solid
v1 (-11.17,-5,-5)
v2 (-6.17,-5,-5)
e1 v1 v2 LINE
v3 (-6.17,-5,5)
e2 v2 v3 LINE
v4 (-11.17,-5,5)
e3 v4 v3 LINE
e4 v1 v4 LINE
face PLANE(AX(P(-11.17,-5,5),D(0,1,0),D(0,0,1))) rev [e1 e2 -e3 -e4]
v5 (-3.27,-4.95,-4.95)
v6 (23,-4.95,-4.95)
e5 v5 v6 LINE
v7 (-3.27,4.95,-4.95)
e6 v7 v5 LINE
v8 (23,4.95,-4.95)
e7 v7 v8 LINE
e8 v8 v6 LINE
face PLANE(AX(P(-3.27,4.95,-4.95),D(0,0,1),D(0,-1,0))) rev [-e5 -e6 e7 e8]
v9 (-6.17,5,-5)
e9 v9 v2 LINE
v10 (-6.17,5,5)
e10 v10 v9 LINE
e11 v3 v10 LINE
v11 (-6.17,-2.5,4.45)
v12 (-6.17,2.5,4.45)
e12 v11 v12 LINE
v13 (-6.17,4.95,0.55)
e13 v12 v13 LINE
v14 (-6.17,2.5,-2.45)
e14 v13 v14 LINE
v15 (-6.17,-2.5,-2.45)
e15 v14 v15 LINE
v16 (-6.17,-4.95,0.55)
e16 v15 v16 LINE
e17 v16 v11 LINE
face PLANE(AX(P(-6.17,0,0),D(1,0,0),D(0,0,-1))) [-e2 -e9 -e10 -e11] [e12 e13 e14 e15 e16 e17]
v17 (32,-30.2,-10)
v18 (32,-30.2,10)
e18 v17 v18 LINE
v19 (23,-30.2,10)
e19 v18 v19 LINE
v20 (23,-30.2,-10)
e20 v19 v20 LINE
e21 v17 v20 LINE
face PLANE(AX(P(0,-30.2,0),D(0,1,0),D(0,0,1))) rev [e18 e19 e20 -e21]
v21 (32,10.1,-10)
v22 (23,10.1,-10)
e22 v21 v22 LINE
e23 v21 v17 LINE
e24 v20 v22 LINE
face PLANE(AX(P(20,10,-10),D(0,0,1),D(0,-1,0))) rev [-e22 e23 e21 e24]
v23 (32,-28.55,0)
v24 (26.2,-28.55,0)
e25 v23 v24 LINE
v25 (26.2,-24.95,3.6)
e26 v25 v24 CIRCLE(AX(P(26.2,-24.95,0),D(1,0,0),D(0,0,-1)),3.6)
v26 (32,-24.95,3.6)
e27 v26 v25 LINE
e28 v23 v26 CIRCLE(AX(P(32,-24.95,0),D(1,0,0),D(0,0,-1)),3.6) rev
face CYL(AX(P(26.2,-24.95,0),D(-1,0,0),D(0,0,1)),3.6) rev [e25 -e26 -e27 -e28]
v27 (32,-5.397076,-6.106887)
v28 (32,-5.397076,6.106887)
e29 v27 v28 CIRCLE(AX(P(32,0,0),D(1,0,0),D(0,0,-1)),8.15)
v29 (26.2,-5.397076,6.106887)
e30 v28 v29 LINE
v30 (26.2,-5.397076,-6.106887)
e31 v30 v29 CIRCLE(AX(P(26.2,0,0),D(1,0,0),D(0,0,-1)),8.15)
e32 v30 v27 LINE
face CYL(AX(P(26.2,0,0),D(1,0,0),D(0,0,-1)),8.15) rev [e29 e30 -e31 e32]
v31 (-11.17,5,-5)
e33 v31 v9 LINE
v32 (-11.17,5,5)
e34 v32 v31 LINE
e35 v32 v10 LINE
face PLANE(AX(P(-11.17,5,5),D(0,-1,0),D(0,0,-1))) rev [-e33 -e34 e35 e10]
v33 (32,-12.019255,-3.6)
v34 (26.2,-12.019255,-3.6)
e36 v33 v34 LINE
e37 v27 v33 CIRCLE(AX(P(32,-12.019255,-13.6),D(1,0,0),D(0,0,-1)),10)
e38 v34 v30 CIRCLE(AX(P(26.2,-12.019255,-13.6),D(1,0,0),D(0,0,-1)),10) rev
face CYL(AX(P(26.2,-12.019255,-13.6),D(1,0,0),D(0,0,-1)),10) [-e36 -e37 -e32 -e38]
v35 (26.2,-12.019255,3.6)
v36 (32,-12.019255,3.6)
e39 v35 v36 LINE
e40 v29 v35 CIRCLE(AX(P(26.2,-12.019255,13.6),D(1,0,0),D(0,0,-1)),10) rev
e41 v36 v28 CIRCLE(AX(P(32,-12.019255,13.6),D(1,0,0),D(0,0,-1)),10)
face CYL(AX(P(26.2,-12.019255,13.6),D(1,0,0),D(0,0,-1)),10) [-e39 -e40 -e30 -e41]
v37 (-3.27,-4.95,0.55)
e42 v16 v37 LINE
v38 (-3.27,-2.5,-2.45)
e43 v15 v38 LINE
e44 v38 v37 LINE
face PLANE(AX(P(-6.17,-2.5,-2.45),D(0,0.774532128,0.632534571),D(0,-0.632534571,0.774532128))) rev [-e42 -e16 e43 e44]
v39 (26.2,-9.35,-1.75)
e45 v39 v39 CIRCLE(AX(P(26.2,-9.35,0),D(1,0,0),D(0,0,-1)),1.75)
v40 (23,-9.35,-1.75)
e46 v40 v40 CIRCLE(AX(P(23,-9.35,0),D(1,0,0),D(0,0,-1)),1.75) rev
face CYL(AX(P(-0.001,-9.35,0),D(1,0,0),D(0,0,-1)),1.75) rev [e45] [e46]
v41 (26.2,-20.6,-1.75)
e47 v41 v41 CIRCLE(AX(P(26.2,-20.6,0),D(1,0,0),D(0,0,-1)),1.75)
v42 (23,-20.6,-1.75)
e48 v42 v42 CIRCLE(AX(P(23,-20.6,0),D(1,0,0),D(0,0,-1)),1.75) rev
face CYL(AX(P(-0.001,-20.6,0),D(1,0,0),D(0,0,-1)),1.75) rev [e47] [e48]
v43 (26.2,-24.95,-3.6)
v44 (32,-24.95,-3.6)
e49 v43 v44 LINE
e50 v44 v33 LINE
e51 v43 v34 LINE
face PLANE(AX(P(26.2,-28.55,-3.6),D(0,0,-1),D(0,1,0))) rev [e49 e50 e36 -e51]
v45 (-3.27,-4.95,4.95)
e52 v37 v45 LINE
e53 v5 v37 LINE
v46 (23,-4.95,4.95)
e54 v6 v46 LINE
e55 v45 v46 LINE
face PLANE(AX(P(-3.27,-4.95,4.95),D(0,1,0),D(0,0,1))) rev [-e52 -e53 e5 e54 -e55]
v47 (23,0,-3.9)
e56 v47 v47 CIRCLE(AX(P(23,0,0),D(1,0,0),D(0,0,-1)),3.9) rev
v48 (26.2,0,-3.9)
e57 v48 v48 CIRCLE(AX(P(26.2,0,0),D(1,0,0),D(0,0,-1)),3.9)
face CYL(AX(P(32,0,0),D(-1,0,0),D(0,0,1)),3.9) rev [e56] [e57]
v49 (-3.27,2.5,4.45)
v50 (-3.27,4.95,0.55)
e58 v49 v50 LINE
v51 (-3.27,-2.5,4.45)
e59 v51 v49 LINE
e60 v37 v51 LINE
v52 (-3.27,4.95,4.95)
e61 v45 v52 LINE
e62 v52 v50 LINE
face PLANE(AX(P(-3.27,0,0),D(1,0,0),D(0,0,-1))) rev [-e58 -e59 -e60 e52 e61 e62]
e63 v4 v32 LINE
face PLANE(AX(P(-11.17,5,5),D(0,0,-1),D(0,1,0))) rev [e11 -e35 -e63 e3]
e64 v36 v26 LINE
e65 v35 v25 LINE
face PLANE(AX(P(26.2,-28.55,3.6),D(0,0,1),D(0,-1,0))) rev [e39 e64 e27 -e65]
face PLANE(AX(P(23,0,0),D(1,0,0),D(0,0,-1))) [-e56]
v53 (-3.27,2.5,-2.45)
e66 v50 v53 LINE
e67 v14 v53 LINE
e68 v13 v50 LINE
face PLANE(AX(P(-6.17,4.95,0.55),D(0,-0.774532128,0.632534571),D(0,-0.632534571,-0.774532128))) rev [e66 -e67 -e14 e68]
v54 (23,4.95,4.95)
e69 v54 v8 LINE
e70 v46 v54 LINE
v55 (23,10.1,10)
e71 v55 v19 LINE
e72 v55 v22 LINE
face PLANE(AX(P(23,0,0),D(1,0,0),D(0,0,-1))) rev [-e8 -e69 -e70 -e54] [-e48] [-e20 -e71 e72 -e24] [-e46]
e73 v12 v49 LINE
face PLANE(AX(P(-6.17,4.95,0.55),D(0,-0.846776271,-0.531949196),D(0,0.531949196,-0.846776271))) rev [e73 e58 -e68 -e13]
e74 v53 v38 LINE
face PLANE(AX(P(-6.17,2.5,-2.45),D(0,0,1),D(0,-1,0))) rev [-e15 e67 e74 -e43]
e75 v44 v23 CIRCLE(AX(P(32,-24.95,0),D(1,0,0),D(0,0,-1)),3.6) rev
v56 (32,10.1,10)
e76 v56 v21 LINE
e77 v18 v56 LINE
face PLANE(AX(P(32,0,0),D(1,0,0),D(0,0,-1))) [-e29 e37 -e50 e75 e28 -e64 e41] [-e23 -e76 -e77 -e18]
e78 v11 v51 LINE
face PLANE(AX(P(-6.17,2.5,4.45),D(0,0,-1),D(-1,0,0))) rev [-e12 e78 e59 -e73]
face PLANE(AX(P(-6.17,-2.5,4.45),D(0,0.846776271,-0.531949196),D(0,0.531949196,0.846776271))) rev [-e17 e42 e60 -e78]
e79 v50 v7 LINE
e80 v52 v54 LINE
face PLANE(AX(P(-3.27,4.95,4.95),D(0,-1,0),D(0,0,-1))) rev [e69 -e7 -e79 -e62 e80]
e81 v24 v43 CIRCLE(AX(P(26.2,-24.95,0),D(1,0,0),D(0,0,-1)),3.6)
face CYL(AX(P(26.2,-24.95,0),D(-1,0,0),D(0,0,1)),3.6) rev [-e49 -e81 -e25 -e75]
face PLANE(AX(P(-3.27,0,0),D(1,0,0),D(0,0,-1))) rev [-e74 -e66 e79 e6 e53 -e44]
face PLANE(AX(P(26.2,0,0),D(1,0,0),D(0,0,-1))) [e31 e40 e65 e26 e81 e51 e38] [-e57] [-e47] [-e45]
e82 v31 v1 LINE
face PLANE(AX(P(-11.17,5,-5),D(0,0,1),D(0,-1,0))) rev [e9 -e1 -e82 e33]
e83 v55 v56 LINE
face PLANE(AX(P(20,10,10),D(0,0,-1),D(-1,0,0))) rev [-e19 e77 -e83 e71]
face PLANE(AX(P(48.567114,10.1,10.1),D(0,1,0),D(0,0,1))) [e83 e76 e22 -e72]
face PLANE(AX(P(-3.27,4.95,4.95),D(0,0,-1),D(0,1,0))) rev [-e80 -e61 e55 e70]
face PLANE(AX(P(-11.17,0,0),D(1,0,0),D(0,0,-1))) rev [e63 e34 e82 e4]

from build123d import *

# Parameters (mm, degrees)
SKETCH1_W            = 20
SKETCH1_H            = 20
BOSS_EXTRUDE1_DEPTH  = 20
SKETCH2_W            = 45
SKETCH2_H            = 70
BOSS_EXTRUDE2_DEPTH  = 12
CUT_EXTRUDE1_DEPTH   = 5.8
FILLET1_R            = 3.6
FILLET2_R            = 10
SKETCH5_R            = 3.9
CUT_EXTRUDE2_DEPTH   = 53.490475326
CUT_EXTRUDE3_REACH   = 51.17
SKETCH6_R            = 1.75
SKETCH7_W            = 12
SKETCH7_H            = 45
CUT_EXTRUDE4_DEPTH   = 4.8
SKETCH9_W            = 12
SKETCH9_H            = 45
CUT_EXTRUDE5_DEPTH   = 23.8
SKETCH10_W           = 12.5
SKETCH10_H           = 41.4
CUT_EXTRUDE6_DEPTH   = 23.8
SKETCH11_W           = 20
SKETCH11_H           = 1.2
CUT_EXTRUDE7_DEPTH   = 23.8
BOSS_EXTRUDE3_START  = 20
SKETCH12_W           = 20
SKETCH12_H           = 20
SKETCH12_R           = 3.9
BOSS_EXTRUDE3_DEPTH  = 20
SKETCH13_W           = 20.2
SKETCH13_H           = 20.2
SKETCH13_R           = 3.9
BOSS_EXTRUDE4_DEPTH  = 40
SKETCH14_W           = 12
SKETCH14_H           = 20
BOSS_EXTRUDE5_DEPTH  = 0.1
SKETCH17_R           = 4.83091966
BOSS_EXTRUDE8_DEPTH  = 39
SKETCH18_W           = 25.638800628
SKETCH18_H           = 46.621959296
CUT_EXTRUDE8_DEPTH   = 43
SKETCH19_W           = 9.9
SKETCH19_H           = 9.9
BOSS_EXTRUDE9_DEPTH  = 26.27
BOSS_EXTRUDE10_DEPTH = 2.9
SKETCH21_W           = 10
SKETCH21_H           = 10
BOSS_EXTRUDE11_DEPTH = 5


with BuildPart() as part:
    # Sketch1 → Boss-Extrude1 (new body)
    with BuildSketch(Plane(origin=(0, 0, 0), x_dir=(0, 0, -1), z_dir=(1, 0, 0))):
        Rectangle(SKETCH1_W, SKETCH1_H)
    extrude(amount=BOSS_EXTRUDE1_DEPTH)

    # Sketch2 → Boss-Extrude2 (add)
    with BuildSketch(Plane(origin=(20, 0, 0), x_dir=(0, 0, -1), z_dir=(1, 0, 0))):
        Rectangle(SKETCH2_W, SKETCH2_H)
    extrude(amount=BOSS_EXTRUDE2_DEPTH)

    # Sketch4 → Cut-Extrude1 (cut)
    with BuildSketch(Plane(origin=(32, 0, 0), x_dir=(0, 0, -1), z_dir=(1, 0, 0))):
        with BuildLine():
            Line((3.6, -28.55), (-3.6, -28.55))
            Line((-3.6, -28.55), (-3.6, -7.311805523))
            ThreePointArc((-3.6, -7.311805523), (0, 8.15), (3.6, -7.311805523))
            Line((3.6, -7.311805523), (3.6, -28.55))
        make_face()
    extrude(amount=-CUT_EXTRUDE1_DEPTH, mode=Mode.SUBTRACT)

    # Fillet1
    fillet1_edges = [part.edges().sort_by_distance(p)[0] for p in [
        (29.1, -28.55, 3.6),
        (29.1, -28.55, -3.6),
    ]]
    fillet(fillet1_edges, radius=FILLET1_R - 0.0001)  # a hair under: the kernel refuses the full size

    # Fillet2
    fillet2_edges = [part.edges().sort_by_distance(p)[0] for p in [
        (29.1, -7.311805523, 3.6),
        (29.1, -7.311805523, -3.6),
    ]]
    fillet(fillet2_edges, radius=FILLET2_R)

    # Sketch5 → Cut-Extrude2 (cut, through all)
    with BuildSketch(Plane.ZY):
        Circle(SKETCH5_R)
    extrude(amount=-CUT_EXTRUDE2_DEPTH, mode=Mode.SUBTRACT)

    # Sketch6 → Cut-Extrude3 (cut, up to next)
    with BuildSketch(Plane(origin=(26.2, 0, 0), x_dir=(0, 0, -1), z_dir=(1, 0, 0)), mode=Mode.PRIVATE) as cut_extrude3_sk1:
        with Locations((0, -20.6)):
            Circle(SKETCH6_R)
    cut_extrude3_tool1 = extrude(cut_extrude3_sk1.sketch, amount=-CUT_EXTRUDE3_REACH, mode=Mode.PRIVATE) & part.part
    # Sketch6 → Cut-Extrude3 (cut, up to next)
    with BuildSketch(Plane(origin=(26.2, 0, 0), x_dir=(0, 0, -1), z_dir=(1, 0, 0)), mode=Mode.PRIVATE) as cut_extrude3_sk2:
        with Locations((0, -9.35)):
            Circle(SKETCH6_R)
    cut_extrude3_tool2 = extrude(cut_extrude3_sk2.sketch, amount=-CUT_EXTRUDE3_REACH, mode=Mode.PRIVATE) & part.part
    add(cut_extrude3_tool1.solids().sort_by_distance((26.2, -20.6, 0))[0], mode=Mode.SUBTRACT)
    add(cut_extrude3_tool2.solids().sort_by_distance((26.2, -9.35, 0))[0], mode=Mode.SUBTRACT)

    # Sketch7 → Cut-Extrude4 (cut)
    with BuildSketch(Plane.XZ.offset(35)):
        with Locations((26, 0)):
            Rectangle(SKETCH7_W, SKETCH7_H)
    extrude(amount=-CUT_EXTRUDE4_DEPTH, mode=Mode.SUBTRACT)

    # Sketch9 → Cut-Extrude5 (cut)
    with BuildSketch(Plane(origin=(0, 35, 0), x_dir=(1, 0, 0), z_dir=(0, 1, 0))):
        with Locations((26, 0)):
            Rectangle(SKETCH9_W, SKETCH9_H)
    extrude(amount=-CUT_EXTRUDE5_DEPTH, mode=Mode.SUBTRACT)

    # Sketch10 → Cut-Extrude6 (cut)
    with BuildSketch(Plane.ZY.offset(-20)):
        with Locations((-16.25, -9.5)):
            Rectangle(SKETCH10_W, SKETCH10_H)
        with Locations((16.25, -9.5)):
            Rectangle(SKETCH10_W, SKETCH10_H)
    extrude(amount=-CUT_EXTRUDE6_DEPTH, mode=Mode.SUBTRACT)

    # Sketch11 → Cut-Extrude7 (cut)
    with BuildSketch(Plane.ZY.offset(-20)):
        with Locations((0, 10.6)):
            Rectangle(SKETCH11_W, SKETCH11_H)
    extrude(amount=-CUT_EXTRUDE7_DEPTH, mode=Mode.SUBTRACT)

    # Sketch12 → Boss-Extrude3 (add)
    with BuildSketch(Plane.ZY.offset(BOSS_EXTRUDE3_START)):
        Rectangle(SKETCH12_W, SKETCH12_H)
        Circle(SKETCH12_R, mode=Mode.SUBTRACT)
    extrude(amount=-BOSS_EXTRUDE3_DEPTH)

    # Sketch13 → Boss-Extrude4 (add)
    with BuildSketch(Plane.ZY.offset(20)):
        Rectangle(SKETCH13_W, SKETCH13_H)
        Circle(SKETCH13_R, mode=Mode.SUBTRACT)
    extrude(amount=-BOSS_EXTRUDE4_DEPTH)

    # Sketch14 → Boss-Extrude5 (add)
    with BuildSketch(Plane(origin=(0, 10, 0), x_dir=(1, 0, 0), z_dir=(0, 1, 0))):
        with Locations((26, 0)):
            Rectangle(SKETCH14_W, SKETCH14_H)
    extrude(amount=BOSS_EXTRUDE5_DEPTH)

    # Sketch17 → Boss-Extrude8 (add)
    with BuildSketch(Plane.ZY.offset(20)):
        Circle(SKETCH17_R)
    extrude(amount=-BOSS_EXTRUDE8_DEPTH)

    # Sketch18 → Cut-Extrude8 (cut)
    with BuildSketch(Plane.ZY.offset(20)):
        with Locations((-2.719400314, -13.210979648)):
            Rectangle(SKETCH18_W, SKETCH18_H)
    extrude(amount=-CUT_EXTRUDE8_DEPTH, mode=Mode.SUBTRACT)

    # Sketch19 → Boss-Extrude9 (add)
    with BuildSketch(Plane.ZY.offset(-23)):
        Rectangle(SKETCH19_W, SKETCH19_H)
    extrude(amount=BOSS_EXTRUDE9_DEPTH)

    # Sketch20 → Boss-Extrude10 (add)
    with BuildSketch(Plane.ZY.offset(3.27)):
        Polygon((0.55, 4.95), (-2.45, 2.5), (-2.45, -2.5), (0.55, -4.95), (4.45, -2.5), (4.45, 2.5), align=None)
    extrude(amount=BOSS_EXTRUDE10_DEPTH)

    # Sketch21 → Boss-Extrude11 (add)
    with BuildSketch(Plane.ZY.offset(6.17)):
        Rectangle(SKETCH21_W, SKETCH21_H)
    extrude(amount=BOSS_EXTRUDE11_DEPTH)


solid = part.part
